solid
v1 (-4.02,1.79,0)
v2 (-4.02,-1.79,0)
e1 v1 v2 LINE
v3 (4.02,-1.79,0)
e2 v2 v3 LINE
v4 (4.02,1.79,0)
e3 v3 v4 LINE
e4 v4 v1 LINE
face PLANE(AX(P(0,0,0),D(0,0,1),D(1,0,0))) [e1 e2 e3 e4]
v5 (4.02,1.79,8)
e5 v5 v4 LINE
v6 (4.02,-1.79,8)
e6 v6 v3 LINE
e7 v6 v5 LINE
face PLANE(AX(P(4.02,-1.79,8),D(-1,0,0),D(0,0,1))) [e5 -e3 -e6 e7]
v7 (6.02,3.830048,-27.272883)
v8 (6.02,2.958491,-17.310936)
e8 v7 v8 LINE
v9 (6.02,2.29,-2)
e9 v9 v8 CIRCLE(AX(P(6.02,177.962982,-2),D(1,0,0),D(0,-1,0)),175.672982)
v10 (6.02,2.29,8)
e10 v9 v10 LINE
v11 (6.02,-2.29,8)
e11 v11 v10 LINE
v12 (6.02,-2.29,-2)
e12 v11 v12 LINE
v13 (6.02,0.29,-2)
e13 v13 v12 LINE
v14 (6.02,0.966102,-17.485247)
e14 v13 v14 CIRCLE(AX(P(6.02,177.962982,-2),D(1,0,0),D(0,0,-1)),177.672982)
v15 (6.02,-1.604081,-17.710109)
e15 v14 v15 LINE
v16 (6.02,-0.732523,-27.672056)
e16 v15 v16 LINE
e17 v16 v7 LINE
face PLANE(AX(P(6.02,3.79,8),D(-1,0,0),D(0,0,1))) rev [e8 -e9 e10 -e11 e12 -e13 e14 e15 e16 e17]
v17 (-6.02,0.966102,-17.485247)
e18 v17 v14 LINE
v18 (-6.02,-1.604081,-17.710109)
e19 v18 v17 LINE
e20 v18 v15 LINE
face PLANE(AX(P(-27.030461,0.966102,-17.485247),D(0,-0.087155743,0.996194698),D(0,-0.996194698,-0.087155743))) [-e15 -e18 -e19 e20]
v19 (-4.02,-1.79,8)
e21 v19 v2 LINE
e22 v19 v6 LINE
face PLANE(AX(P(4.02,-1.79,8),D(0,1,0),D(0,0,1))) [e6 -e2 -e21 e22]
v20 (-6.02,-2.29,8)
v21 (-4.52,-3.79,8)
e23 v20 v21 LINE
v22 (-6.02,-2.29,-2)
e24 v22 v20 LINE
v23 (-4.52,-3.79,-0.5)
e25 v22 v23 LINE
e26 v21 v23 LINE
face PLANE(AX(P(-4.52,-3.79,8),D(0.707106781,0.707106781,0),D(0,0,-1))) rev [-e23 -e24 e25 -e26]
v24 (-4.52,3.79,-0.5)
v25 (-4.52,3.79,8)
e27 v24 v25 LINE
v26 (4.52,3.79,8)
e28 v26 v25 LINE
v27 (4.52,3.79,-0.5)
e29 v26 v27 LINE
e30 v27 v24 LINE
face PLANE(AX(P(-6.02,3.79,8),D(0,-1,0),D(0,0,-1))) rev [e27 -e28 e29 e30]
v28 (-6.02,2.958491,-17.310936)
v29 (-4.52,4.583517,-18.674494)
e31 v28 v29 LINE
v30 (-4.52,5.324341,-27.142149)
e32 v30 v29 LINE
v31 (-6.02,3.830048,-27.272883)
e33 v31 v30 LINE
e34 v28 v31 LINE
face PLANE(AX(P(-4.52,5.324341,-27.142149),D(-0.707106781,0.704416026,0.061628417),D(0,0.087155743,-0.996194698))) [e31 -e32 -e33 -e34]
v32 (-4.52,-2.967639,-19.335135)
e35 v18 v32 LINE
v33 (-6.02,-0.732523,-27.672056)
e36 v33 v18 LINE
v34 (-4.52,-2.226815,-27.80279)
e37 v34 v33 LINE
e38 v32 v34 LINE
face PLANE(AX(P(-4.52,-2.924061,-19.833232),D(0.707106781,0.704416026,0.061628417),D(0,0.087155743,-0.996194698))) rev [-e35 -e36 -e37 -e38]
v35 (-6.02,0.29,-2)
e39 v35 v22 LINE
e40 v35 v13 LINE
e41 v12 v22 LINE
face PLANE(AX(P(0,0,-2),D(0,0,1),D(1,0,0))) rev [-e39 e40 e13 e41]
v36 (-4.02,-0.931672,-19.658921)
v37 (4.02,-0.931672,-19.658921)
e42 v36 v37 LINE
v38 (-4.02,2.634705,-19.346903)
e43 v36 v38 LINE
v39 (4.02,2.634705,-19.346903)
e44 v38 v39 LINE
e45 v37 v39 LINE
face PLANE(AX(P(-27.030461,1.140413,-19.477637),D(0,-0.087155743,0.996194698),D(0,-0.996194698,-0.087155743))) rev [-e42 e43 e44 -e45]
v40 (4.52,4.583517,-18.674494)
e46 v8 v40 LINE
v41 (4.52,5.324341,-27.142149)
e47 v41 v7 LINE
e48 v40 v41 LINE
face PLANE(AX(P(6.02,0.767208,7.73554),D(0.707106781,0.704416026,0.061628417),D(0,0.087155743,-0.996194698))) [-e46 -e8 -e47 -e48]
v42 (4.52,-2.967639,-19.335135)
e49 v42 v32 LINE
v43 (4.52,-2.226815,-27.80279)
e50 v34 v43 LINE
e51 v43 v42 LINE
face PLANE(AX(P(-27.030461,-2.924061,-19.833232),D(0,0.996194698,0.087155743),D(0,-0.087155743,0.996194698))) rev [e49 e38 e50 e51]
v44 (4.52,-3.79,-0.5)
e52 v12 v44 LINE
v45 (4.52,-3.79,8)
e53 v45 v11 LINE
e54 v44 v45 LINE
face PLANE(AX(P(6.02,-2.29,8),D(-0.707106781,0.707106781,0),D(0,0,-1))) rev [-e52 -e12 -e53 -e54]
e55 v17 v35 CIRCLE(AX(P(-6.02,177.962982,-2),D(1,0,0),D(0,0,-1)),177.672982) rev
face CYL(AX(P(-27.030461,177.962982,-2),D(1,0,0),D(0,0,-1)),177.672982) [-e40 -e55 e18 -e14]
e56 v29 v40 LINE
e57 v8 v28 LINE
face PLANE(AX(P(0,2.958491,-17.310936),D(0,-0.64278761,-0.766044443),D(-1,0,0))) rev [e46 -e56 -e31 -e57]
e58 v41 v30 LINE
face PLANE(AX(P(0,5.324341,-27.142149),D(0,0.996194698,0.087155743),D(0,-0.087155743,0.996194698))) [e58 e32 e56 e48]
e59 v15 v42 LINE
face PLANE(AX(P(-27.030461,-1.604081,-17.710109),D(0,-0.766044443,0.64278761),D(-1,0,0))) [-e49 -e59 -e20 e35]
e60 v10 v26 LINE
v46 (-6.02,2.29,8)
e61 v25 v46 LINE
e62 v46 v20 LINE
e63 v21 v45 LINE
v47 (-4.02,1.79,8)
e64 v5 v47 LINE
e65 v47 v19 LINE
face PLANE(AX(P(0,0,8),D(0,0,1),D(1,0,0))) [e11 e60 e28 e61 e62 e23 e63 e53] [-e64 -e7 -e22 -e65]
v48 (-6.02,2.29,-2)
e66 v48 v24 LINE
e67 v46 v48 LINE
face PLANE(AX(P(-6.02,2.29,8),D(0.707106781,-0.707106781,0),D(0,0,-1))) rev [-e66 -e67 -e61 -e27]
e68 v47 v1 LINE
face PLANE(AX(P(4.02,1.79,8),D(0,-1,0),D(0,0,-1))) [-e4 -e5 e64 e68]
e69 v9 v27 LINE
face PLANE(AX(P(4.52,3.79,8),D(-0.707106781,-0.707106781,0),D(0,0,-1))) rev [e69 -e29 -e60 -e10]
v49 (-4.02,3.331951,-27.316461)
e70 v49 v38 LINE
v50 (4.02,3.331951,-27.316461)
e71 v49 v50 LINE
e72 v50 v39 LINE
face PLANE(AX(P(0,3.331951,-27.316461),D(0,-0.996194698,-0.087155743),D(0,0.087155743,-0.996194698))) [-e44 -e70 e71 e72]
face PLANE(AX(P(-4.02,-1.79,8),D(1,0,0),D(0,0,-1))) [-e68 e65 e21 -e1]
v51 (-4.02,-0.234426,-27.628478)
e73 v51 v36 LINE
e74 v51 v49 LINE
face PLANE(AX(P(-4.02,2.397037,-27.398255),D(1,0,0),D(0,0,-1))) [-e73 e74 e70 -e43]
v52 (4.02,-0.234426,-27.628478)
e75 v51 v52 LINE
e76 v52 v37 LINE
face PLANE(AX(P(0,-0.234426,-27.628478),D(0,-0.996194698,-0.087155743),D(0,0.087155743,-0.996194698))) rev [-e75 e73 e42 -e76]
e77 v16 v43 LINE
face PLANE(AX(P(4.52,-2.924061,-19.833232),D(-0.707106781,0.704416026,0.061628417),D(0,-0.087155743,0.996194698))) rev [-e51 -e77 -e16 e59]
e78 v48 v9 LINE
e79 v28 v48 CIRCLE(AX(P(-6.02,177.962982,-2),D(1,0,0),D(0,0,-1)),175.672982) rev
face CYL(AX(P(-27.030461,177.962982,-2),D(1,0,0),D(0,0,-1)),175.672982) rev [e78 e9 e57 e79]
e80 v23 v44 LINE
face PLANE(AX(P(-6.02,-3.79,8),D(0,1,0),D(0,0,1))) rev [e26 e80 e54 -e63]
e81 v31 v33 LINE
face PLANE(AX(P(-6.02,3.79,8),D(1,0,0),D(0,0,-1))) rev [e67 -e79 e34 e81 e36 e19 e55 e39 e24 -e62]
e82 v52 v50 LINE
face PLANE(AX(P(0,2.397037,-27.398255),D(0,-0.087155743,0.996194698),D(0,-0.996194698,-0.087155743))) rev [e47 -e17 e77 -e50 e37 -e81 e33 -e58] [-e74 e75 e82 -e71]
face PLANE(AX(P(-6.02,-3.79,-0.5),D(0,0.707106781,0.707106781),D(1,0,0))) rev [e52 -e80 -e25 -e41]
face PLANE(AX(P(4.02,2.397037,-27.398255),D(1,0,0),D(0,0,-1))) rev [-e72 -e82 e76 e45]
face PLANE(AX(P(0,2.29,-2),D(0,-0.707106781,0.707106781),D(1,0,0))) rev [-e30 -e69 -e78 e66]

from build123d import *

# Parameters (mm, degrees)
SKETCH1_W           = 12.04
SKETCH1_H           = 7.58
SKETCH1_W_2         = 8.04
SKETCH1_H_2         = 3.58
BOSS_EXTRUDE1_DEPTH = 8
SKETCH1_2_W         = 12.04
SKETCH1_2_H         = 7.58
SKETCH1_2_W_2       = 8.04
SKETCH1_2_H_2       = 3.58
BOSS_EXTRUDE2_DEPTH = 2
EXTRUDE_THIN1_START = -12.04
EXTRUDE_THIN1_DEPTH = 12.04
SKETCH5_W           = 12.04
SKETCH5_H           = 7.58
SKETCH5_W_2         = 8.04
SKETCH5_H_2         = 3.58
BOSS_EXTRUDE4_DEPTH = 10
SKETCH5_4_W         = 12.04
SKETCH5_4_H         = 7.58
BOSS_EXTRUDE5_DEPTH = 2
CHAMFER1_SIZE       = 1.5


with BuildPart() as part:
    # Sketch1 → Boss-Extrude1 (new body)
    with BuildSketch(Plane.XY):
        Rectangle(SKETCH1_W, SKETCH1_H)
        Rectangle(SKETCH1_W_2, SKETCH1_H_2, mode=Mode.SUBTRACT)
    extrude(amount=BOSS_EXTRUDE1_DEPTH)

    # Sketch1<2> → Boss-Extrude2 (add)
    # profile 1 of 2: a face of its own
    with BuildSketch(Plane.XY):
        Rectangle(SKETCH1_2_W, SKETCH1_2_H)
        Rectangle(SKETCH1_2_W_2, SKETCH1_2_H_2, mode=Mode.SUBTRACT)
    # profile 2 of 2: a face of its own
    with BuildSketch(Plane.XY):
        Rectangle(SKETCH1_2_W_2, SKETCH1_2_H_2)
    extrude(amount=-BOSS_EXTRUDE2_DEPTH)

    # Sketch3 → Extrude-Thin1 (add)
    with BuildSketch(Plane(origin=(6.02, 9.81, 0), x_dir=(0, -1, 0), z_dir=(1, 0, 0)).offset(EXTRUDE_THIN1_START)):
        with BuildLine():
            Line((13.6, 2), (9.52, 2))
            ThreePointArc((9.52, 2), (9.350894106, 9.75), (8.843898328, 17.485247384))
            Line((8.843898328, 17.485247384), (12.908372696, 17.840842814))
            Line((12.908372696, 17.840842814), (12.734061211, 19.83323221))
            Line((12.734061211, 19.83323221), (6.665855308, 19.302332986))
            ThreePointArc((6.665855308, 19.302332986), (7.352797663, 9.662761226), (7.508614841, 0))
            Line((7.508614841, 0), (13.6, 0))
            Line((13.6, 0), (13.6, 2))
        make_face()
    extrude(amount=EXTRUDE_THIN1_DEPTH)

    # Sketch5 → Boss-Extrude4 (add)
    with BuildSketch(Plane(origin=(0, -2.22544681, -17.764471695), x_dir=(-1, 0, 0), z_dir=(0, 0.08715574274765182, -0.9961946980917462))):
        with Locations((0, 2.913739678)):
            Rectangle(SKETCH5_W, SKETCH5_H)
        with Locations((0, 2.913739678)):
            Rectangle(SKETCH5_W_2, SKETCH5_H_2, mode=Mode.SUBTRACT)
    extrude(amount=BOSS_EXTRUDE4_DEPTH)

    # Sketch5<4> → Boss-Extrude5 (add)
    with BuildSketch(Plane(origin=(0, -2.22544681, -17.764471695), x_dir=(-1, 0, 0), z_dir=(0, 0.08715574274765182, -0.9961946980917462))):
        with Locations((0, 2.913739678)):
            Rectangle(SKETCH5_4_W, SKETCH5_4_H)
    extrude(amount=BOSS_EXTRUDE5_DEPTH)

    # Chamfer1
    chamfer1_edges = [part.edges().sort_by_distance(p)[0] for p in [
        (0, -3.79, -2),
        (0, 3.79, -2),
        (-6.02, -2.662593983, -22.821816304),
        (6.02, -2.662593983, -22.821816304),
        (0, -3.098372696, -17.840842814),
        (6.02, -3.79, 3),
        (-6.02, -3.79, 3),
        (-6.02, 3.79, 3),
        (6.02, 3.79, 3),
        (0, 4.452783115, -17.180202284),
        (6.02, 4.888561829, -22.161175774),
        (-6.02, 4.888561829, -22.161175774),
    ]]
    chamfer(chamfer1_edges, length=CHAMFER1_SIZE - 0.0001)  # a hair under: the kernel refuses the full size


solid = part.part
